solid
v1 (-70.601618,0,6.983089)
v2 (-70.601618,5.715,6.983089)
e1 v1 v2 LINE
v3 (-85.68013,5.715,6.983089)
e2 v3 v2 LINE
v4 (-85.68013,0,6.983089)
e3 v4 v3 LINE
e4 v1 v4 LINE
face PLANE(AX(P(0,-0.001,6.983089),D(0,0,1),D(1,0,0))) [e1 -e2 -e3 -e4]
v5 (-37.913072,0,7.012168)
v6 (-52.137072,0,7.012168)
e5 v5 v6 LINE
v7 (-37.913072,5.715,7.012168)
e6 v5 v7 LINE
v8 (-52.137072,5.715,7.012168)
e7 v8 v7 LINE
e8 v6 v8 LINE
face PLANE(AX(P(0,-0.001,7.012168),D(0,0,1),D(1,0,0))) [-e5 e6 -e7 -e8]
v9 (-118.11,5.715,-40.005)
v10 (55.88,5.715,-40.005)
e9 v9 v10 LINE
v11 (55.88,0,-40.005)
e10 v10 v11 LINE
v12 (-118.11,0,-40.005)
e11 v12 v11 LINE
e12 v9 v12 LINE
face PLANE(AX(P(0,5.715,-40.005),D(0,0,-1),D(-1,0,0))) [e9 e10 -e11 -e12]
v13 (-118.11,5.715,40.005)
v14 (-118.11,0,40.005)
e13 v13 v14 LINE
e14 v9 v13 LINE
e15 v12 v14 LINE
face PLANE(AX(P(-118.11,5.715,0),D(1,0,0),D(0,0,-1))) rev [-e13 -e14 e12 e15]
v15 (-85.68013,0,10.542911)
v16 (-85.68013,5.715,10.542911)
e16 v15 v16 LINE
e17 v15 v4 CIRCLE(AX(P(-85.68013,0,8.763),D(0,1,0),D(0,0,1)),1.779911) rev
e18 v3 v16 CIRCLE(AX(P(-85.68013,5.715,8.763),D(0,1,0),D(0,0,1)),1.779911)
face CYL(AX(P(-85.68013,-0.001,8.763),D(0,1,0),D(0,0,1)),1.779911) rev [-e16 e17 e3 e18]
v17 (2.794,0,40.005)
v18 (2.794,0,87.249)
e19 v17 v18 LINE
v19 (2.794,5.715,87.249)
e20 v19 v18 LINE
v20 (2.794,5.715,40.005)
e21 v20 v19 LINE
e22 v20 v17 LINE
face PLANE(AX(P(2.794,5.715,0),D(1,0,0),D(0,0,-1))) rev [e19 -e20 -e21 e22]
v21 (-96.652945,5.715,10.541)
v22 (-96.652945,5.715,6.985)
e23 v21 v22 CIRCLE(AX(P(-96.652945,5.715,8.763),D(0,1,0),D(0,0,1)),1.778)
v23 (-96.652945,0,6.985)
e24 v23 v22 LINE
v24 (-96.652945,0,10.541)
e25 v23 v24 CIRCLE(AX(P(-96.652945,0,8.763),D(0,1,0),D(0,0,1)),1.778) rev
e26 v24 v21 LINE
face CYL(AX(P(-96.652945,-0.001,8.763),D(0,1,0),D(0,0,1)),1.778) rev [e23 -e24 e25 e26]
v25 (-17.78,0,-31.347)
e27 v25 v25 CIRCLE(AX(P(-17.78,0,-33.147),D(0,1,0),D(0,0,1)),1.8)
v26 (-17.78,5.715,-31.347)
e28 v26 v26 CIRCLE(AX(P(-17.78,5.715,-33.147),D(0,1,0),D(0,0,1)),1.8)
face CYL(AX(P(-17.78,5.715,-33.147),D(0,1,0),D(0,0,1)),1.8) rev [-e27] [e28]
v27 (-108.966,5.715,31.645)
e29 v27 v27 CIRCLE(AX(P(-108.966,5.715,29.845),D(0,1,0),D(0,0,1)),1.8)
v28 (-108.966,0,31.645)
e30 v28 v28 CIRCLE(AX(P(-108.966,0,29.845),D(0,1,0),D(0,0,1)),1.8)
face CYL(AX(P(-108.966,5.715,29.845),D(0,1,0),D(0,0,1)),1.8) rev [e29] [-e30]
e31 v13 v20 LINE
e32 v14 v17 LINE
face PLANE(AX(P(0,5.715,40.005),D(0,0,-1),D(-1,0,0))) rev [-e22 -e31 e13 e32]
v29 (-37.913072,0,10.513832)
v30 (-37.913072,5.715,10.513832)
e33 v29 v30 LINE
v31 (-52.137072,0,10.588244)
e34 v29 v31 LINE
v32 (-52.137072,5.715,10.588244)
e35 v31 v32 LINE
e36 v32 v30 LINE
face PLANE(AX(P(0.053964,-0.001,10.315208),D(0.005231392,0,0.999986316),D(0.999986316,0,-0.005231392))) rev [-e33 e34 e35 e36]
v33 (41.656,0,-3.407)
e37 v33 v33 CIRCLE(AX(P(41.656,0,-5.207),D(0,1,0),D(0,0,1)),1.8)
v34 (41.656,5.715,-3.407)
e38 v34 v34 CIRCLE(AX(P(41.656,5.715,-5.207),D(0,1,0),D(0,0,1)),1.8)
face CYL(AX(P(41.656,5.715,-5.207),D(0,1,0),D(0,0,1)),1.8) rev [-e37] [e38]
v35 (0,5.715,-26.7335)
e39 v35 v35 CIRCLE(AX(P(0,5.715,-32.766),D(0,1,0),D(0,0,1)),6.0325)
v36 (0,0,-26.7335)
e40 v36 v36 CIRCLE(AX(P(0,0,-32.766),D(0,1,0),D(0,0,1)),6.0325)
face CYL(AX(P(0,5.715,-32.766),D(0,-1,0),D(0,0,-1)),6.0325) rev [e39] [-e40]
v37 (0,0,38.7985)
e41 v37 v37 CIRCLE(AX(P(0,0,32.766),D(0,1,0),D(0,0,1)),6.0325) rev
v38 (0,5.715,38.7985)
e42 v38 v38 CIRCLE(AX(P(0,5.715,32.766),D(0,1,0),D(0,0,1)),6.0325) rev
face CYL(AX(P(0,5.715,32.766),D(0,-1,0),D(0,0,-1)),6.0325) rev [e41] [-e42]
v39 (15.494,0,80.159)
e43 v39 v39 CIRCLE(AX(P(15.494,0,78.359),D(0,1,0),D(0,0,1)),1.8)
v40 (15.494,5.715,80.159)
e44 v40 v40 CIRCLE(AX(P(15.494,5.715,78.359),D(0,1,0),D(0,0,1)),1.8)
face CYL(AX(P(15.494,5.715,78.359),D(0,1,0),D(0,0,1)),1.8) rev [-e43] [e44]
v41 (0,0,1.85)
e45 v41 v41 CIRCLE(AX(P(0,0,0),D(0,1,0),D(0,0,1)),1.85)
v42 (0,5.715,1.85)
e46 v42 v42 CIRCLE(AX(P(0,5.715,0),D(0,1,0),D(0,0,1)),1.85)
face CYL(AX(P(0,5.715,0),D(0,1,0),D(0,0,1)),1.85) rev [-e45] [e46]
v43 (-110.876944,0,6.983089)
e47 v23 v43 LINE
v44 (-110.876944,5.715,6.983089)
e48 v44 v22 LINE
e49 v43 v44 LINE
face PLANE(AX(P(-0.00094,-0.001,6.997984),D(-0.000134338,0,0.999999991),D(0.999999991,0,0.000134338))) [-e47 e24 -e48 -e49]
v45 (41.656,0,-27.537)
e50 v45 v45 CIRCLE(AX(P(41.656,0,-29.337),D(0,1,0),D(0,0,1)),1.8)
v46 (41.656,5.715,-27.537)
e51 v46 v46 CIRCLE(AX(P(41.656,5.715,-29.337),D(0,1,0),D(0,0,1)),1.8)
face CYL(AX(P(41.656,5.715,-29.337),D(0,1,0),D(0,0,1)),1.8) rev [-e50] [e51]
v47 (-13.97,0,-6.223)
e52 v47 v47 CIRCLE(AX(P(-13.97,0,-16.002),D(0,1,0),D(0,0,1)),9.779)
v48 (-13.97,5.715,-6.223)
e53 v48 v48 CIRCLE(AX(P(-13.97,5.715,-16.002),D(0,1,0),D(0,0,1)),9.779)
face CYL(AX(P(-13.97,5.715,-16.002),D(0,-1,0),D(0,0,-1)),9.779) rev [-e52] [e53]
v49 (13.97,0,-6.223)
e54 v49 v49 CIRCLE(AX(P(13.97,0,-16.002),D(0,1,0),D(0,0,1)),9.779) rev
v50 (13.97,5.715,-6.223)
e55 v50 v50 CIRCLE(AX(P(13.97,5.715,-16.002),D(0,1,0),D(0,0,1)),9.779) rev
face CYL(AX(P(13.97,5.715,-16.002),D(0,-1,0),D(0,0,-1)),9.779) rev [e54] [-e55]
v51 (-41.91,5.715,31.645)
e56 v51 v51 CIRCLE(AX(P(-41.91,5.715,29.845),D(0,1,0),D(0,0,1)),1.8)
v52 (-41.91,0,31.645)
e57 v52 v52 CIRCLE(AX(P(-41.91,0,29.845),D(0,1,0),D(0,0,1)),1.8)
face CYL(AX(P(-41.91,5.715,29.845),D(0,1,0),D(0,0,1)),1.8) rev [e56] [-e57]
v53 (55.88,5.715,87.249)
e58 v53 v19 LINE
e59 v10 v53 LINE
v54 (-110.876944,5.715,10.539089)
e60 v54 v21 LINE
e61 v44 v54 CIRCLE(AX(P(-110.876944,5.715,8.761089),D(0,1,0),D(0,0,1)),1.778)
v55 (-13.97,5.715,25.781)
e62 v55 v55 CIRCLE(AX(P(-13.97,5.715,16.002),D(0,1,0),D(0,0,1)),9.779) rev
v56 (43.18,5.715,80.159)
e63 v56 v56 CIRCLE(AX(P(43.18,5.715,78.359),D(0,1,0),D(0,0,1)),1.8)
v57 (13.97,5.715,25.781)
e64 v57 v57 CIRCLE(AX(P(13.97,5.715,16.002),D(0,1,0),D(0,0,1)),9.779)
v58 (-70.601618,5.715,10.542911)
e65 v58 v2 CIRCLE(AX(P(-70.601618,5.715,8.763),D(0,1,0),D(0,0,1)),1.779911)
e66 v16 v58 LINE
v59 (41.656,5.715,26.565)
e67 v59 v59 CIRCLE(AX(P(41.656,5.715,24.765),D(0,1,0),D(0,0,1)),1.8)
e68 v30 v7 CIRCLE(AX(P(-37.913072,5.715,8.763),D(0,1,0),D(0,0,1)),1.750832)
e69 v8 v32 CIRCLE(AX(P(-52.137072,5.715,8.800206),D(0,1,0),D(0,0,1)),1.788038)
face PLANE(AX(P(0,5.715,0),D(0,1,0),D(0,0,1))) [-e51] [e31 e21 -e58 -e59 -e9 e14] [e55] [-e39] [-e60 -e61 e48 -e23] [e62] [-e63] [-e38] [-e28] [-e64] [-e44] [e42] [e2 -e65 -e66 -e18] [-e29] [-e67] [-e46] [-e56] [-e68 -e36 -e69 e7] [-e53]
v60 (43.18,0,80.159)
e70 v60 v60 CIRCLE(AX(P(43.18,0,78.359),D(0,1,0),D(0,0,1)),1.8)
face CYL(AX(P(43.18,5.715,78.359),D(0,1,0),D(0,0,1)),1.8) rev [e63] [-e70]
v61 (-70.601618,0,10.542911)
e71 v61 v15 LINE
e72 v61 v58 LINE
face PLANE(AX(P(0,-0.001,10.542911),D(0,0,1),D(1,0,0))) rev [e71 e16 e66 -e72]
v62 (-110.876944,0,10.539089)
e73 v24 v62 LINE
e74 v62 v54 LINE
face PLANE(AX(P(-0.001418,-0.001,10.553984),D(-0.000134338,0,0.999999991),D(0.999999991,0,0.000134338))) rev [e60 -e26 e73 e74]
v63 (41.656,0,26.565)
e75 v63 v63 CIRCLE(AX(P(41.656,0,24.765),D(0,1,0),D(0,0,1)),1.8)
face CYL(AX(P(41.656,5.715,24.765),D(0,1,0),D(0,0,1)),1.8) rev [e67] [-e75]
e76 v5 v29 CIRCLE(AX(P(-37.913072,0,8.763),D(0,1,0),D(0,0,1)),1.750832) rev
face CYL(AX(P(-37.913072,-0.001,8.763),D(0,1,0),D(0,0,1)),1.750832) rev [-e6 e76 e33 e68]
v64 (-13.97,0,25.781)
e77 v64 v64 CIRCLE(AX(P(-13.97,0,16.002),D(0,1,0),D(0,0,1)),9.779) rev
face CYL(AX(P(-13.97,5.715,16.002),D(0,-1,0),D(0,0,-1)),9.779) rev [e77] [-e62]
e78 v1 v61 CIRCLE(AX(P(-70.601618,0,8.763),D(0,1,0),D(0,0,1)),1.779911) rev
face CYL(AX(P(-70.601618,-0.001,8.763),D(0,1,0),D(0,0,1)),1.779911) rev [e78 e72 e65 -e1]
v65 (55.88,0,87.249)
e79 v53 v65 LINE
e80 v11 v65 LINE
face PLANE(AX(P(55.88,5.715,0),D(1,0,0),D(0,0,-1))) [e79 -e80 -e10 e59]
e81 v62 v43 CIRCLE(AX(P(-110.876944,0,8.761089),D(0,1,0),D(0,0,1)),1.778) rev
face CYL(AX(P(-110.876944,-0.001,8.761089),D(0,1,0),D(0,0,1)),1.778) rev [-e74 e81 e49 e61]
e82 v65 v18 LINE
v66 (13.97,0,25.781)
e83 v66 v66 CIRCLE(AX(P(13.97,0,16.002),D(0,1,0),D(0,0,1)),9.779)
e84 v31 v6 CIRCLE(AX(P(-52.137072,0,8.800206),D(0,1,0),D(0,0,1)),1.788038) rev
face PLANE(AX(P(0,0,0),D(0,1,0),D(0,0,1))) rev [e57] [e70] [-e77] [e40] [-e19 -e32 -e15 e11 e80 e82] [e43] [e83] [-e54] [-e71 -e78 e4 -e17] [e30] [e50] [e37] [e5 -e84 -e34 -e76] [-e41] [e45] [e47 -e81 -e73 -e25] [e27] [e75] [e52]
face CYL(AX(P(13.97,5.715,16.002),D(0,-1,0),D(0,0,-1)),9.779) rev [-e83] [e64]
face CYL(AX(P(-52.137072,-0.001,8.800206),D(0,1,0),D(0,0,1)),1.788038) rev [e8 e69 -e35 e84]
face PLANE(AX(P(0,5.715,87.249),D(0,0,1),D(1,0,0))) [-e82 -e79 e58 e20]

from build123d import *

# Parameters (mm, degrees)
SKETCH1_W                = 88.9
SKETCH1_H                = 80.01
SKETCH1_R                = 9.779
SKETCH1_R_2              = 6.0325
SKETCH1_W_2              = 73.66
SKETCH1_W_3              = 11.43
BOSS_EXTRUDE1_DEPTH      = 5.715
M3_CLEARANCE_HOLE1_D     = 3.6
M3_CLEARANCE_HOLE1_DEPTH = 25.4
M3_CLEARANCE_HOLE1_TIP   = 1.081549114
M3_CLEARANCE_HOLE2_D     = 3.7
M3_CLEARANCE_HOLE2_DEPTH = 25.4
M3_CLEARANCE_HOLE2_TIP   = 1.111592145
CUT_EXTRUDE1_START       = -5.715
CUT_EXTRUDE1_DEPTH       = 5.715


# Read off the part's stored shape, not the designer's step: Cut-Extrude1
with BuildPart() as part:
    # Sketch1 → Boss-Extrude1 (new body)
    # profile 1 of 4: a face of its own
    with BuildSketch(Plane(origin=(0, 0, 0), x_dir=(1, 0, 0), z_dir=(0, 1, 0))):
        Rectangle(SKETCH1_W, SKETCH1_H)
        with Locations(Location((-13.97, -16.002, 0), (0, 0, 270))):
            Circle(SKETCH1_R, mode=Mode.SUBTRACT)
        with Locations(Location((13.97, -16.002, 0), (0, 0, 270))):
            Circle(SKETCH1_R, mode=Mode.SUBTRACT)
        with Locations(Location((-13.97, 16.002, 0), (0, 0, 270))):
            Circle(SKETCH1_R, mode=Mode.SUBTRACT)
        with Locations(Location((13.97, 16.002, 0), (0, 0, 270))):
            Circle(SKETCH1_R, mode=Mode.SUBTRACT)
        with Locations(Location((0, 32.766, 0), (0, 0, 270))):
            Circle(SKETCH1_R_2, mode=Mode.SUBTRACT)
        with Locations(Location((0, -32.766, 0), (0, 0, 270))):
            Circle(SKETCH1_R_2, mode=Mode.SUBTRACT)
    # profile 2 of 4: a face of its own
    with BuildSketch(Plane(origin=(0, 0, 0), x_dir=(1, 0, 0), z_dir=(0, 1, 0))):
        with Locations((-81.28, 0)):
            Rectangle(SKETCH1_W_2, SKETCH1_H)
    # profile 3 of 4: a face of its own
    with BuildSketch(Plane(origin=(0, 0, 0), x_dir=(1, 0, 0), z_dir=(0, 1, 0))):
        with Locations((50.165, 0)):
            Rectangle(SKETCH1_W_3, SKETCH1_H)
    # profile 4 of 4: a face of its own
    with BuildSketch(Plane(origin=(0, 0, 0), x_dir=(1, 0, 0), z_dir=(0, 1, 0))):
        Polygon((55.88, -40.005), (44.45, -40.005), (2.794, -40.005), (2.794, -87.249), (55.88, -87.249), align=None)
    extrude(amount=BOSS_EXTRUDE1_DEPTH)

    # M3 Clearance Hole1
    with Locations(Plane(origin=(0, 5.715, 0), x_dir=(1, 0, 0), z_dir=(0, 1, 0))):
        with Locations((-17.78, 33.147), (41.656, 29.337), (41.656, 5.207), (41.656, -24.765), (43.18, -78.359), (15.494, -78.359), (-41.91, -29.845), (-108.966, -29.845)):
            Hole(M3_CLEARANCE_HOLE1_D / 2, depth=M3_CLEARANCE_HOLE1_DEPTH)
            with Locations((0, 0, -(M3_CLEARANCE_HOLE1_DEPTH + M3_CLEARANCE_HOLE1_TIP / 2))):  # 118° drill point
                Cone(0, M3_CLEARANCE_HOLE1_D / 2, M3_CLEARANCE_HOLE1_TIP, mode=Mode.SUBTRACT)

    # M3 Clearance Hole2
    with Locations(Plane(origin=(0, 5.715, 0), x_dir=(1, 0, 0), z_dir=(0, 1, 0))):
        with Locations((0, 0)):
            Hole(M3_CLEARANCE_HOLE2_D / 2, depth=M3_CLEARANCE_HOLE2_DEPTH)
            with Locations((0, 0, -(M3_CLEARANCE_HOLE2_DEPTH + M3_CLEARANCE_HOLE2_TIP / 2))):  # 118° drill point
                Cone(0, M3_CLEARANCE_HOLE2_D / 2, M3_CLEARANCE_HOLE2_TIP, mode=Mode.SUBTRACT)

    # Cut-Extrude1 outline → Cut-Extrude1 (cut)
    with BuildSketch(Plane(origin=(0, 5.715, 0), x_dir=(1, 0, 0), z_dir=(0, 1, 0)).offset(CUT_EXTRUDE1_START)):
        with BuildLine():
            Line((-52.137072336, -10.588243938), (-37.913072336, -10.513831599))
            ThreePointArc((-37.913072336, -10.513831599), (-36.162240737, -8.763), (-37.913072336, -7.012168401))
            Line((-37.913072336, -7.012168401), (-52.137072336, -7.012168401))
            ThreePointArc((-52.137072336, -7.012168401), (-53.925110105, -8.80020617), (-52.137072336, -10.588243938))
        make_face()
        with BuildLine():
            Line((-110.876944468, -10.539089177), (-96.652944596, -10.541))
            ThreePointArc((-96.652944596, -10.541), (-94.874944596, -8.763), (-96.652944596, -6.985))
            Line((-96.652944596, -6.985), (-110.876944468, -6.983089177))
            ThreePointArc((-110.876944468, -6.983089177), (-112.654944468, -8.761089177), (-110.876944468, -10.539089177))
        make_face()
        with BuildLine():
            ThreePointArc((-85.680129902, -6.983089177), (-87.460040724, -8.763), (-85.680129902, -10.542910823))
            Line((-85.680129902, -10.542910823), (-70.60161816, -10.542910823))
            ThreePointArc((-70.60161816, -10.542910823), (-68.821707338, -8.763), (-70.60161816, -6.983089177))
            Line((-70.60161816, -6.983089177), (-85.680129902, -6.983089177))
        make_face()
    extrude(amount=CUT_EXTRUDE1_DEPTH, mode=Mode.SUBTRACT)


solid = part.part
